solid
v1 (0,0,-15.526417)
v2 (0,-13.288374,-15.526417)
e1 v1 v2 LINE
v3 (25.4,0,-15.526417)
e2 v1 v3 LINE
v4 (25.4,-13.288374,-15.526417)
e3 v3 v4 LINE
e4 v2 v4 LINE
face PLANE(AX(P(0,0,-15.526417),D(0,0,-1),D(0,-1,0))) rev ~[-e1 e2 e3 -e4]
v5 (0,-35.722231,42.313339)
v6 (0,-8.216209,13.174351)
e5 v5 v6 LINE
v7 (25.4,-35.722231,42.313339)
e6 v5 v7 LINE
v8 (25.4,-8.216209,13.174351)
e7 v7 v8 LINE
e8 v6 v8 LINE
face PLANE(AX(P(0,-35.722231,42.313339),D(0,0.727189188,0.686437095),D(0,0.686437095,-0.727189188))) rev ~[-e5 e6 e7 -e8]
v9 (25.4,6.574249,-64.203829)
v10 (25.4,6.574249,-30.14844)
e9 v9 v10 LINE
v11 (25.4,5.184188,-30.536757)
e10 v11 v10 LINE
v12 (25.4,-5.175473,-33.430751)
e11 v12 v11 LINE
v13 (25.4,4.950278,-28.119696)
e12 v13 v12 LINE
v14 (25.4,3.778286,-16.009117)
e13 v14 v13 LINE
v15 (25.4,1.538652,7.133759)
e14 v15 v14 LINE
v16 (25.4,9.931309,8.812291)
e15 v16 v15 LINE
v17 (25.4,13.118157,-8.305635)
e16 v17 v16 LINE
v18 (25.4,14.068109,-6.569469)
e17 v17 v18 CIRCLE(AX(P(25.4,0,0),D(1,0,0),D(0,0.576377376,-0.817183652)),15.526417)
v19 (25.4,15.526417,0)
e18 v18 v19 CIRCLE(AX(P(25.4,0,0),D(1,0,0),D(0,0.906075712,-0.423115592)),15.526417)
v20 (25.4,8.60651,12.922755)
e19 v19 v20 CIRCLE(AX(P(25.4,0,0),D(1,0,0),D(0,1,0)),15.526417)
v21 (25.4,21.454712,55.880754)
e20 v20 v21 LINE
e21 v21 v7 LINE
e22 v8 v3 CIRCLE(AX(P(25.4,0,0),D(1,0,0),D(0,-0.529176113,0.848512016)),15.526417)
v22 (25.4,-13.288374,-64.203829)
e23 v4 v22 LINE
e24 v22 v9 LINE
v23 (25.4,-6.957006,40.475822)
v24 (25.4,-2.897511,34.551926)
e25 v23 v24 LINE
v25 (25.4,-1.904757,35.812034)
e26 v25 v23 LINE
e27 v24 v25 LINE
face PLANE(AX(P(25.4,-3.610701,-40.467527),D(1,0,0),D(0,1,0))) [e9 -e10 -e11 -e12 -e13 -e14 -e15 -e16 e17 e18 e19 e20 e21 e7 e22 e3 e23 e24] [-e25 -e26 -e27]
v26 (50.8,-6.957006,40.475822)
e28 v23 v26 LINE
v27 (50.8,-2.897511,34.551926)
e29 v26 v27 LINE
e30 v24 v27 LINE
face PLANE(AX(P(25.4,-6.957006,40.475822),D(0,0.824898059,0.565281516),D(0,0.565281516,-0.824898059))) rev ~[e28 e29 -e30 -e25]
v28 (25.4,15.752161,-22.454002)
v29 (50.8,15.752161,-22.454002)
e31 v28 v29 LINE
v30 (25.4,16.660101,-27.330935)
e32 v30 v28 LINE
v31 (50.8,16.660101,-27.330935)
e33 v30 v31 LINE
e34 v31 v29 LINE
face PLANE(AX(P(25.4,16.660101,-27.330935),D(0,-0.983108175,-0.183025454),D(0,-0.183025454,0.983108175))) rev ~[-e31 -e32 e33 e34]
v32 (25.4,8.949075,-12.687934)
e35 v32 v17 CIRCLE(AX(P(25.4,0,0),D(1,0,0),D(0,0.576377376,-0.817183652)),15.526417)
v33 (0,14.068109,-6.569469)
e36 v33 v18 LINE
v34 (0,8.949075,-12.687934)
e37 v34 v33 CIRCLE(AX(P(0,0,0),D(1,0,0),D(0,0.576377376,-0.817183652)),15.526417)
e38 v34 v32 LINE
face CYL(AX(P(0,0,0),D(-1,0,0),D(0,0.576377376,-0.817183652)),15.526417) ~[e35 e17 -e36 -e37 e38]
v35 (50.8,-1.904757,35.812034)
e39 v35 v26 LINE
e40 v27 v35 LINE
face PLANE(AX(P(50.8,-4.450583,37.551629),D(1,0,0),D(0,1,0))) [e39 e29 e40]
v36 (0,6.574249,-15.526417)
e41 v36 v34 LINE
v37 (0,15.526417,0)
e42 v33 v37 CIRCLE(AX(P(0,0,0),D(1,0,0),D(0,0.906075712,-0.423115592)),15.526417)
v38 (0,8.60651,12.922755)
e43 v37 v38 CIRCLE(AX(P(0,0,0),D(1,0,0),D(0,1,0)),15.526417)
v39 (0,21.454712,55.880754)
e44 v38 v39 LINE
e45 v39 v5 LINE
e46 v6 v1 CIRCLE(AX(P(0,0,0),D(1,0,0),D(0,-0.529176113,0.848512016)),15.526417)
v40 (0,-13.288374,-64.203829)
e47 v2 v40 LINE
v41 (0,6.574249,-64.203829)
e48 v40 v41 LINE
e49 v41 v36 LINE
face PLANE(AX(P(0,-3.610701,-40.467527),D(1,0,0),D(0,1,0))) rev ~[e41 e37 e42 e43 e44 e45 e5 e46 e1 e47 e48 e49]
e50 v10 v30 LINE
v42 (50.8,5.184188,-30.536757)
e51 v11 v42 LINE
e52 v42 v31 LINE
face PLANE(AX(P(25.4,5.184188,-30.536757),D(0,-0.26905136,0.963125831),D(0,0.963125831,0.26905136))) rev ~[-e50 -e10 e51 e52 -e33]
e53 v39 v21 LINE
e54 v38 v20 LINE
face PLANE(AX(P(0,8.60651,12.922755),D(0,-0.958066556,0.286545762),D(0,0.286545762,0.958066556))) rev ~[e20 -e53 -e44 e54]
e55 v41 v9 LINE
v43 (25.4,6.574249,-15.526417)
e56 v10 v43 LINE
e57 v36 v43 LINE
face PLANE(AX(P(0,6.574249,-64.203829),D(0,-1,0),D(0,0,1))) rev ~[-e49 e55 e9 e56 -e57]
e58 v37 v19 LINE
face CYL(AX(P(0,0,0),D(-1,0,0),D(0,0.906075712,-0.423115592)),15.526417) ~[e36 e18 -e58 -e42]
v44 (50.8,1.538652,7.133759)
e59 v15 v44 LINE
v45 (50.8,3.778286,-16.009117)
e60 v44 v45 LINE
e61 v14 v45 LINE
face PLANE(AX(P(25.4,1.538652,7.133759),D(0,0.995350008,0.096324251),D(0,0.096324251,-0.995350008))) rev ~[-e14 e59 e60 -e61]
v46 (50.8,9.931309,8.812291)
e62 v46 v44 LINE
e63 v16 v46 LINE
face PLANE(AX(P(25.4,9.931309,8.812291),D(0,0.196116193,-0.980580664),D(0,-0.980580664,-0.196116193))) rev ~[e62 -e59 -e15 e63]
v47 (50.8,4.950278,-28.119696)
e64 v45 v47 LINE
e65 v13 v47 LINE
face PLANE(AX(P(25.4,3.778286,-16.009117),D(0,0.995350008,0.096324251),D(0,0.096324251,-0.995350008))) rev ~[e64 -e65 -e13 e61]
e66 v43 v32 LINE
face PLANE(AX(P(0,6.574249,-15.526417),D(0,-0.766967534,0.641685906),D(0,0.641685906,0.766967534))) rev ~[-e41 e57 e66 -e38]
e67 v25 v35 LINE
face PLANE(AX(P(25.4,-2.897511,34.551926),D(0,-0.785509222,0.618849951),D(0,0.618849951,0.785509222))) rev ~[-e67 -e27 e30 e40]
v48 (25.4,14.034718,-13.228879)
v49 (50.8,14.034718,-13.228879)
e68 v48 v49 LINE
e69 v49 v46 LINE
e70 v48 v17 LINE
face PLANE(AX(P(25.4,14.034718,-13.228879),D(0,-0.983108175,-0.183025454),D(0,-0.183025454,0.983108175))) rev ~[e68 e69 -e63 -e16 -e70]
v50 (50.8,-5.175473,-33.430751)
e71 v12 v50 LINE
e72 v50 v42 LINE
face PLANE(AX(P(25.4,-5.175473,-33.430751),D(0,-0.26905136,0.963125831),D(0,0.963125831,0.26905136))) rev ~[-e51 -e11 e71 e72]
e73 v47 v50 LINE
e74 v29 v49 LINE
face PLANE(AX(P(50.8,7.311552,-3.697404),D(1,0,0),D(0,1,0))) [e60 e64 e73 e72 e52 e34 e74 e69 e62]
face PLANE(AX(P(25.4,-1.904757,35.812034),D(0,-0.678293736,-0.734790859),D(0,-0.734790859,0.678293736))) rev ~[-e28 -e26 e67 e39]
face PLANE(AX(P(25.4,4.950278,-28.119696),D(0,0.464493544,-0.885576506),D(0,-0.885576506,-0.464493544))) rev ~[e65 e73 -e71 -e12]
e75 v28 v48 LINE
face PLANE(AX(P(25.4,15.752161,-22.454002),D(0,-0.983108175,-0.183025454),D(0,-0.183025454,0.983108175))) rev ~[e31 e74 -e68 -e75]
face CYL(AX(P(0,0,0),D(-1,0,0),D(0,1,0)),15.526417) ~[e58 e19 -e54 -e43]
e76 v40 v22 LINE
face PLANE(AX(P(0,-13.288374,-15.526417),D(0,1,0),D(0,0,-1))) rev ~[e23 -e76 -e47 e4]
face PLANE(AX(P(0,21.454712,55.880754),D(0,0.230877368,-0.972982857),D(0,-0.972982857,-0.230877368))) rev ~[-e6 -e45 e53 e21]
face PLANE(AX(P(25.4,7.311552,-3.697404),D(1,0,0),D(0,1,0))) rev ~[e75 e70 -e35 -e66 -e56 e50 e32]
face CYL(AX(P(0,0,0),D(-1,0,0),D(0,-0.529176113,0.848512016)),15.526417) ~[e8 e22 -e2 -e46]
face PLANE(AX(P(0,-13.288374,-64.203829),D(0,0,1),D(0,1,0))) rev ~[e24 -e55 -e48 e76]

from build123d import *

# Parameters (mm, degrees)
F1_DEPTH = 25.4
F3_DEPTH = 25.4


with BuildPart() as f1:
    # F0 (on Right) → F1 (new body)
    with BuildSketch(Plane.YZ):
        Polygon((-13.2883740589, -47.1408768902), (-13.2883740589, -64.2038285732), (6.5742493607, -64.2038285732), (6.5742493607, -19.7971570041), (0, -15.5264167115), (-13.2883740589, -15.5264167115), align=None)
        Polygon((0, -15.5264167115), (6.5742493607, -19.7971570041), (6.5742493607, -15.5264167115), align=None)
        with BuildLine():
            Line((0, -15.5264167115), (6.5742493607, -15.5264167115))
            Line((6.5742493607, -15.5264167115), (8.9490753187, -12.6879339074))
            ThreePointArc((8.9490753187, -12.6879339074), (4.6942234099, -14.7997933255), (0, -15.5264167115))
        make_face()
        with BuildLine():
            ThreePointArc((-8.216208845, 13.1743511459), (-14.9268228651, -4.2731224008), (0, -15.5264167115))
            ThreePointArc((0, -15.5264167115), (4.6942234099, -14.7997933255), (8.9490753187, -12.6879339074))
            Line((8.9490753187, -12.6879339074), (14.0681090783, -6.5694689939))
            ThreePointArc((14.0681090783, -6.5694689939), (15.1574559177, -3.3646910711), (15.5264167115, 0))
            ThreePointArc((15.5264167115, 0), (13.6875468883, 7.3294390017), (8.6065101962, 12.9227550523))
            Line((8.6065101962, 12.9227550523), (4.6159664635, -0.419639051))
            Line((4.6159664635, -0.419639051), (-8.216208845, 13.1743511459))
        make_face()
        with BuildLine():
            Line((14.0681090783, -6.5694689939), (8.9490753187, -12.6879339074))
            ThreePointArc((8.9490753187, -12.6879339074), (11.908257539, -9.9630827701), (14.0681090783, -6.5694689939))
        make_face()
        with BuildLine():
            Line((-35.7222311496, 42.3133387746), (-8.216208845, 13.1743511459))
            ThreePointArc((-8.216208845, 13.1743511459), (0.2321829769, 15.5246805753), (8.6065101962, 12.9227550523))
            Line((8.6065101962, 12.9227550523), (21.4547120332, 55.8807537376))
            Line((21.4547120332, 55.8807537376), (-35.7222311496, 42.3133387746))
        make_face()
        with BuildLine():
            ThreePointArc((8.6065101962, 12.9227550523), (0.2321829769, 15.5246805753), (-8.216208845, 13.1743511459))
            Line((-8.216208845, 13.1743511459), (4.6159664635, -0.419639051))
            Line((4.6159664635, -0.419639051), (8.6065101962, 12.9227550523))
        make_face()
    extrude(amount=F1_DEPTH)

    # F2 (on face) → F3 (join)
    with BuildSketch(Plane.YZ.offset(25.4)):
        Polygon((-2.8975114851, 34.5519260837), (-1.9047569793, 35.8120341569), (-6.9570055408, 40.475821833), align=None)
        Polygon((9.9313091487, 8.8122906163), (1.5386517625, 7.1337586269), (3.7782862439, -16.0091173098), (14.0347183236, -13.2288791008), align=None)
        Polygon((14.0347183236, -13.2288791008), (3.7782862439, -16.0091173098), (4.9502783877, -28.1196956248), (15.7521614301, -22.4540022549), align=None)
        Polygon((15.7521614301, -22.4540022549), (4.9502783877, -28.1196956248), (5.1841876849, -30.5367569319), (16.6601009867, -27.330934827), align=None)
        Polygon((5.1841876849, -30.5367569319), (4.9502783877, -28.1196956248), (-5.1754731685, -33.4307514131), align=None)
    extrude(amount=F3_DEPTH)


solid = f1.part
